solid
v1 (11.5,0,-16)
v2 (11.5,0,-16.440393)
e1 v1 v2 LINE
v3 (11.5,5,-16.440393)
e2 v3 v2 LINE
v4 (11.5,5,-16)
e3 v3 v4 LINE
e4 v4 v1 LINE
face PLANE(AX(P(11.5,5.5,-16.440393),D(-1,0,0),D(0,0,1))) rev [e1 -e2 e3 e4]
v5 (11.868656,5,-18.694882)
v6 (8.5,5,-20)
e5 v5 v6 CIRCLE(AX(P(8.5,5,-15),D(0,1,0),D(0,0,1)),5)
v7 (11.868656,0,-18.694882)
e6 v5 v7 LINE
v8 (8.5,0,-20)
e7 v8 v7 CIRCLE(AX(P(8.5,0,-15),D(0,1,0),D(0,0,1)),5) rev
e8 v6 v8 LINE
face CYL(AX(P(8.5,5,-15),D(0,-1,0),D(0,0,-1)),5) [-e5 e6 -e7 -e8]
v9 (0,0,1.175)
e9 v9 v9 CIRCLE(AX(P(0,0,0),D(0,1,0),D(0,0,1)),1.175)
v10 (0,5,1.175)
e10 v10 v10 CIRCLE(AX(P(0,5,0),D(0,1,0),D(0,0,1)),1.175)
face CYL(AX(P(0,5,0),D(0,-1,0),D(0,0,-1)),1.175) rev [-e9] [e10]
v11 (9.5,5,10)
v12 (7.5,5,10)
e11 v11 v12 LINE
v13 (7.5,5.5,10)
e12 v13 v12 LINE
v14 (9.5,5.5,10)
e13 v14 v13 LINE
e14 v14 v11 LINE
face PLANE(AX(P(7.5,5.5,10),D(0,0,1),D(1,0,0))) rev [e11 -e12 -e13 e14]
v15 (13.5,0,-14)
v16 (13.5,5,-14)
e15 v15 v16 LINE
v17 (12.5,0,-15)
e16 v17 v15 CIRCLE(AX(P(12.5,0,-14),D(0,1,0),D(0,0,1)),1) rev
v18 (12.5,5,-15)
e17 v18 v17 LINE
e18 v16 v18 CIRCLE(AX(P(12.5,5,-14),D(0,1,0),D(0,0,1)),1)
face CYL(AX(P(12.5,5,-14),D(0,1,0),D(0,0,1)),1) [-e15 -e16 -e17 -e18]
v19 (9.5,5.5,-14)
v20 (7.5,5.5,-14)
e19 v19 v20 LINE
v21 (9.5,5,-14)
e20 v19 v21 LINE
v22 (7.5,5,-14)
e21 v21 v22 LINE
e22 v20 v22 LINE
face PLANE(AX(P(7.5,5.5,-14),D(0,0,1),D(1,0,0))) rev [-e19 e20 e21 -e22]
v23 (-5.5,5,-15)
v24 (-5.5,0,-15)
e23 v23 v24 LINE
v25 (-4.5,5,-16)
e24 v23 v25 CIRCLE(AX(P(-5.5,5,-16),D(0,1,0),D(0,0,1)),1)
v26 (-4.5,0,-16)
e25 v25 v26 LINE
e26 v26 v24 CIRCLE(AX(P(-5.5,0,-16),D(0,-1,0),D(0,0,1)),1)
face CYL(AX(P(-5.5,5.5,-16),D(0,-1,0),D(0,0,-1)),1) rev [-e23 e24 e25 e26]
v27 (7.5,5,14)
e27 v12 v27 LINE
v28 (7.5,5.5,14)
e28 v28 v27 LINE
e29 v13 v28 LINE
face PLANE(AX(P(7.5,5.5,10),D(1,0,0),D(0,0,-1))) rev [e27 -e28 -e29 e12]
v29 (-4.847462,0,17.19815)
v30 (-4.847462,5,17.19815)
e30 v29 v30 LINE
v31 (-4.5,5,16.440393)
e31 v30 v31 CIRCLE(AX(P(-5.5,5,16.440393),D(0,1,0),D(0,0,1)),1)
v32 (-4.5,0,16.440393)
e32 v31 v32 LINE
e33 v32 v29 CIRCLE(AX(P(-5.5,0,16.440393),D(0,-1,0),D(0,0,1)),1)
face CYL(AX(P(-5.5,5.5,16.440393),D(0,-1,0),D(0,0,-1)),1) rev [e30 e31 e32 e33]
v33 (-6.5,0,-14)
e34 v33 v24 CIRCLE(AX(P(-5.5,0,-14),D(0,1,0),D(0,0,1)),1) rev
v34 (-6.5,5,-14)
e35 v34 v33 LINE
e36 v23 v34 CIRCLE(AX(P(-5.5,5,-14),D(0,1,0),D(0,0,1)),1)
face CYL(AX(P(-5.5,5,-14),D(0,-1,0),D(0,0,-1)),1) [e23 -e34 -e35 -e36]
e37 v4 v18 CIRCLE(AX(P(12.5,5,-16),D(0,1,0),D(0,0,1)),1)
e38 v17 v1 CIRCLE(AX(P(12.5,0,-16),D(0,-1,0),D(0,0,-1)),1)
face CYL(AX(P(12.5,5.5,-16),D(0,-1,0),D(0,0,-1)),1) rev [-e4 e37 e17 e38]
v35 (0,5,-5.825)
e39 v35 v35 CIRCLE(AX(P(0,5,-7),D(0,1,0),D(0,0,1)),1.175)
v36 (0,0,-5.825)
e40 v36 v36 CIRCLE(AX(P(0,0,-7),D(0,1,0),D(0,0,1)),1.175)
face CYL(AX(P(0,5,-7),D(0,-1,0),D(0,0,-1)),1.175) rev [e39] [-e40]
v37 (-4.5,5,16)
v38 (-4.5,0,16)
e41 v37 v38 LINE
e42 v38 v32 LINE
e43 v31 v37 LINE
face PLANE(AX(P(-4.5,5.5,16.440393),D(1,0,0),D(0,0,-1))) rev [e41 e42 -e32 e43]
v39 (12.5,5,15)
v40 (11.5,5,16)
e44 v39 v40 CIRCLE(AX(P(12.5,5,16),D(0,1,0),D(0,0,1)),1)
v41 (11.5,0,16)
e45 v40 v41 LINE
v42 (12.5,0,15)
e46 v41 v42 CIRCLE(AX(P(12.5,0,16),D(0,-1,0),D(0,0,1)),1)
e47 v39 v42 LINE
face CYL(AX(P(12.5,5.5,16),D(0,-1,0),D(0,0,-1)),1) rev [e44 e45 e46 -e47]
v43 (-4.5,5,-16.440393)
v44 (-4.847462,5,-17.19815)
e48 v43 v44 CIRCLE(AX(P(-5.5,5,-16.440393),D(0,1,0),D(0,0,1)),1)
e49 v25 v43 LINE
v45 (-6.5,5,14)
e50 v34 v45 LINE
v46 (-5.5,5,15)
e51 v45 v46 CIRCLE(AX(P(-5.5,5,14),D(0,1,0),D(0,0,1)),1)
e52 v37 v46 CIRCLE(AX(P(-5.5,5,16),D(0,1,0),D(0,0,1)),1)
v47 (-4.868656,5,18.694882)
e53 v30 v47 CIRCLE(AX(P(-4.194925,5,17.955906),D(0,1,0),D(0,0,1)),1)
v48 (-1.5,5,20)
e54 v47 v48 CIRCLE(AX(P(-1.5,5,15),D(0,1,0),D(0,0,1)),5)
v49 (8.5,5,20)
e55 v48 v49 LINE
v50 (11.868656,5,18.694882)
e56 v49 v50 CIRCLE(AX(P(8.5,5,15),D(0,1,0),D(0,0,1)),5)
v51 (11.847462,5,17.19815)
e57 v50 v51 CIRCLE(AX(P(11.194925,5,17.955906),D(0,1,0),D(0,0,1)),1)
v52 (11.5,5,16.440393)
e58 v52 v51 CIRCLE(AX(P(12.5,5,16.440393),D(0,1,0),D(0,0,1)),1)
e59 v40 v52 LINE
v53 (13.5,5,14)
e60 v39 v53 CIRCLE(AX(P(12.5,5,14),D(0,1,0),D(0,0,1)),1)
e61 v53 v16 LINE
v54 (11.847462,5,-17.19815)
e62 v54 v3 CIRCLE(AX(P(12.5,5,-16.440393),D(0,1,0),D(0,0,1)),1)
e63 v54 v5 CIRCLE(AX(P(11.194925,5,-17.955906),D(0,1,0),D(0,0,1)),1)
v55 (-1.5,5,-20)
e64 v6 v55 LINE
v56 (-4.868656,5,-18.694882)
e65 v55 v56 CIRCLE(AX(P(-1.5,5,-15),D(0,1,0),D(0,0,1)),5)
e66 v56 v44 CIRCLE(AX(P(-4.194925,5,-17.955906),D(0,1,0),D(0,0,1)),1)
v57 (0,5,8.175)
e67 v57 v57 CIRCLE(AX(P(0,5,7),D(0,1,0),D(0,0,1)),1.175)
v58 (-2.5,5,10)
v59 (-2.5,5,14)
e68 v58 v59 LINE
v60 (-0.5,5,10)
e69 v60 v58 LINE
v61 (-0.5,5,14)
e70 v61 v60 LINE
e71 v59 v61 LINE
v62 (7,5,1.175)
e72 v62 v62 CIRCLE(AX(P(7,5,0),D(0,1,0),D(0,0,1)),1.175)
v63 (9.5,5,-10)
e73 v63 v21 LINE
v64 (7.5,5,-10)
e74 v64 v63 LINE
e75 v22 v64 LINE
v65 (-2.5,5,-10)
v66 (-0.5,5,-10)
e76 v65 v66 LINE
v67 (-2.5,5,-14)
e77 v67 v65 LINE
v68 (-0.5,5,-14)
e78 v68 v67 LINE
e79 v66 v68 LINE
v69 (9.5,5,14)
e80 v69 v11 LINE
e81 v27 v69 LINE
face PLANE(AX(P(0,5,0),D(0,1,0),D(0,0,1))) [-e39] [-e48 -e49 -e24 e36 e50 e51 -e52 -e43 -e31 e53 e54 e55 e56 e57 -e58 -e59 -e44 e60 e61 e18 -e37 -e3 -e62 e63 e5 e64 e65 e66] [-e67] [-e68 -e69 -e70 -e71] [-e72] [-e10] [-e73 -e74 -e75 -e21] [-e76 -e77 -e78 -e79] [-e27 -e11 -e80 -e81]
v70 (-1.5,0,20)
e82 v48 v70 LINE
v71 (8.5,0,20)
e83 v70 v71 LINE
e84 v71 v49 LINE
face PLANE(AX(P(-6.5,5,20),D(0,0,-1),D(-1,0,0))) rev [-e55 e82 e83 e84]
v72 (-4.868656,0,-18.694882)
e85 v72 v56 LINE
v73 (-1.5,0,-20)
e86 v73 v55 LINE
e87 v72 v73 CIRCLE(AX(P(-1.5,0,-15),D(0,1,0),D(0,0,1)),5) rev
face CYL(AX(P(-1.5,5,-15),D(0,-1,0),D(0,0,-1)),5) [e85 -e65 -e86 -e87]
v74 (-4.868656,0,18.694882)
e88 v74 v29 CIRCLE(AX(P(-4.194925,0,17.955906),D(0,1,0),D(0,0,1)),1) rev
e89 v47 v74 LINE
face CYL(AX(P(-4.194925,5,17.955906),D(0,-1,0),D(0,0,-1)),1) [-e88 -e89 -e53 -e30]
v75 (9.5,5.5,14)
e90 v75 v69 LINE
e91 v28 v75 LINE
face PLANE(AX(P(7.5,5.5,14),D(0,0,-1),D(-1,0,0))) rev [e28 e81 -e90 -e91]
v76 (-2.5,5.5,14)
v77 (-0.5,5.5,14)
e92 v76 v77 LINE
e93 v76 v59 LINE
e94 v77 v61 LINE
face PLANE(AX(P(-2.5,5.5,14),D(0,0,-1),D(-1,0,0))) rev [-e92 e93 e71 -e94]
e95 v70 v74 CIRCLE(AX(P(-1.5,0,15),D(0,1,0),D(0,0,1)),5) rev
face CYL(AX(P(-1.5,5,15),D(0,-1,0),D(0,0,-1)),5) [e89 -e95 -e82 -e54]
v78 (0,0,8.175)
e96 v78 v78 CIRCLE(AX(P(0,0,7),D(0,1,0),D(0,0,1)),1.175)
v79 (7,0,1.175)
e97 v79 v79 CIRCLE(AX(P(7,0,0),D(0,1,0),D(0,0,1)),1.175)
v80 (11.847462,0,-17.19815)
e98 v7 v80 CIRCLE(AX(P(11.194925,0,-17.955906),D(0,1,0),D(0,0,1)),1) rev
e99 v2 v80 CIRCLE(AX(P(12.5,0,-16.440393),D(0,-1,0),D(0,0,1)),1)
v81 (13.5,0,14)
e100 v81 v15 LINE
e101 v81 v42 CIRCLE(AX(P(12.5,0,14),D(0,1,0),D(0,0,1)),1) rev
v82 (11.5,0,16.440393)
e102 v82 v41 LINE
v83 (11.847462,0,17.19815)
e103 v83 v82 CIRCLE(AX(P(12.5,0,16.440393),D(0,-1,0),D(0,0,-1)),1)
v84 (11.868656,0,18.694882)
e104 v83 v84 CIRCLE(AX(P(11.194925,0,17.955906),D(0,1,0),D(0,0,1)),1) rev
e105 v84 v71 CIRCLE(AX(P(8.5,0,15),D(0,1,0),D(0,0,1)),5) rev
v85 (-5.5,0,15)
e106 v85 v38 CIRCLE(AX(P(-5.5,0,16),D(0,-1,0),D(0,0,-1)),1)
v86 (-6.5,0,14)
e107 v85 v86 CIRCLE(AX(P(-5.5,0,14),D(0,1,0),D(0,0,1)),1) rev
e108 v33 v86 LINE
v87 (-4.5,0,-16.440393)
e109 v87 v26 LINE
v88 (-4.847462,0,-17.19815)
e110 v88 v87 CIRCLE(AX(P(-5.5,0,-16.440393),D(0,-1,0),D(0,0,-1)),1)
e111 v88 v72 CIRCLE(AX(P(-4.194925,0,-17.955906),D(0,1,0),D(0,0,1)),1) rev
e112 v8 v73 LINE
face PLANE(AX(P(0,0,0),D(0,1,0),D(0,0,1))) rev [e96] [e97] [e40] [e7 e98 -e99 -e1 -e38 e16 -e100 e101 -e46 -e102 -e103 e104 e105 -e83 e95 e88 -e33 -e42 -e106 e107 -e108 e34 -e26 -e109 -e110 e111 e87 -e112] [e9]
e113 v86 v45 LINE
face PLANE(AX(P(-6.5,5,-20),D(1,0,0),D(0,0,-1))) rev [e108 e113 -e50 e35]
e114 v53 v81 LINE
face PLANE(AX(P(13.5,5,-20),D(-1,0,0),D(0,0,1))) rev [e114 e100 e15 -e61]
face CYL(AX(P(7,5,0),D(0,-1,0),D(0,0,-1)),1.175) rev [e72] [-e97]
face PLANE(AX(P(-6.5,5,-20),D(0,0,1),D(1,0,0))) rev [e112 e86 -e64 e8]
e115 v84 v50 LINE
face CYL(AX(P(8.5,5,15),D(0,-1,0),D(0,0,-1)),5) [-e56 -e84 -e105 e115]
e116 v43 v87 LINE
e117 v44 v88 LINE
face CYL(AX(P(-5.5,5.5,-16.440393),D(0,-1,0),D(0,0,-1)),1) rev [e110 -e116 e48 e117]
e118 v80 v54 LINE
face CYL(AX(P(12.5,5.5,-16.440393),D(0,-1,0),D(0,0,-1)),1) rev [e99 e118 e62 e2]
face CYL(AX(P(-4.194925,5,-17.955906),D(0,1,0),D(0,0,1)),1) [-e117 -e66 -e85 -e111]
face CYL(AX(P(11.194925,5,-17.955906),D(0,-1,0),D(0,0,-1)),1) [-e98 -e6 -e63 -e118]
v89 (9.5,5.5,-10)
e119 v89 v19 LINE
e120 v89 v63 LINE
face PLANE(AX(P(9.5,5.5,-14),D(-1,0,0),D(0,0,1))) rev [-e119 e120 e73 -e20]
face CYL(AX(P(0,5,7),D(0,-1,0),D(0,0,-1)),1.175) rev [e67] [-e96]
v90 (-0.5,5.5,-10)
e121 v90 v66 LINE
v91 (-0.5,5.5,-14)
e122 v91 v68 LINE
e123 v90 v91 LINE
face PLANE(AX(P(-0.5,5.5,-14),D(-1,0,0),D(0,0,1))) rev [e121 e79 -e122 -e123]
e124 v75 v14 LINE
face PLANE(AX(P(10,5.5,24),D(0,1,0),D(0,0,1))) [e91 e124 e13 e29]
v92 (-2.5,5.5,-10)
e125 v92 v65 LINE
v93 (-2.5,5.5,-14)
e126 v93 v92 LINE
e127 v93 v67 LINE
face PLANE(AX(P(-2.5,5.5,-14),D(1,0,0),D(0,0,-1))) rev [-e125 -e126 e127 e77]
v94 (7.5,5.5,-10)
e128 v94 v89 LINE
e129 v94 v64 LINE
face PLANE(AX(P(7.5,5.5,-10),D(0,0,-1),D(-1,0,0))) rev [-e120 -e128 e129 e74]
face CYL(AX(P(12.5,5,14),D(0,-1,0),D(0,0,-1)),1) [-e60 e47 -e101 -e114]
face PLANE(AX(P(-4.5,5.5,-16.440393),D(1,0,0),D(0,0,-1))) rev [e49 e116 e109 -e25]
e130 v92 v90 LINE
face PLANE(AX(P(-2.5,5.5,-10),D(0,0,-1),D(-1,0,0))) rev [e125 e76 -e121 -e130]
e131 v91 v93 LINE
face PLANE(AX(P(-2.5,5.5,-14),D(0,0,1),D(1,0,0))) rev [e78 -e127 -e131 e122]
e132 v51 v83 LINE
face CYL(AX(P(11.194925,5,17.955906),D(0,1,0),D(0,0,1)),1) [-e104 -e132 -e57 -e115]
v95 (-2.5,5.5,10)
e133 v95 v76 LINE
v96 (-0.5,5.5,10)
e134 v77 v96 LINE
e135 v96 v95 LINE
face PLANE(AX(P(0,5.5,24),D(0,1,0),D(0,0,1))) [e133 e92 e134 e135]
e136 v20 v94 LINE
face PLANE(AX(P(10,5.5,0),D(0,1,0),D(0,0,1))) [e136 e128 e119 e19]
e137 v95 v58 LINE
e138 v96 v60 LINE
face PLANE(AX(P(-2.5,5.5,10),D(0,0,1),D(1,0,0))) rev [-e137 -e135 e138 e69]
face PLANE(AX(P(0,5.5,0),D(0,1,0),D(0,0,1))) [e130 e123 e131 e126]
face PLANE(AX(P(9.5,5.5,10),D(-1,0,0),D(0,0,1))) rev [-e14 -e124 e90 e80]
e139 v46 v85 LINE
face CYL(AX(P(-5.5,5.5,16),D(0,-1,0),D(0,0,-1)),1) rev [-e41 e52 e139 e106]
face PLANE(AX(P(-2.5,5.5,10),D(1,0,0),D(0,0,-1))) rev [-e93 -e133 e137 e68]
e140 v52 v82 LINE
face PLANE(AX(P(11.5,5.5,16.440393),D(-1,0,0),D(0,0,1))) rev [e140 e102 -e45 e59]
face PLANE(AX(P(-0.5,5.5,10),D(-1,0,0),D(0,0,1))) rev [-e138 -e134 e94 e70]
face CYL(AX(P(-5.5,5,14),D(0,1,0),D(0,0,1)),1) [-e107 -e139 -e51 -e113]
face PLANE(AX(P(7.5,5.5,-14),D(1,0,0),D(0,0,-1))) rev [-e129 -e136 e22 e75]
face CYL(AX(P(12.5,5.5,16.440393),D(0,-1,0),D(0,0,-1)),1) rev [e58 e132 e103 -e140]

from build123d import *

# Parameters (mm, degrees)
SKETCH1_W            = 20
SKETCH1_H            = 40
SKETCH1_R            = 1.175
BOSS_EXTRUDE1_DEPTH  = 5
FILLET1_R            = 5
SKETCH2_W            = 2
SKETCH2_H            = 4
BOSS_EXTRUDE2_DEPTH  = 0.5
LPATTERN1_COUNT      = 2
LPATTERN1_PITCH      = 10
LPATTERN1_COUNT_DIR2 = 2
LPATTERN1_PITCH_DIR2 = 24
CUT_EXTRUDE1_DEPTH   = 25.748737342
FILLET2_R            = 1


with BuildPart() as part:
    # Sketch1 → Boss-Extrude1 (new body)
    with BuildSketch(Plane(origin=(0, 0, 0), x_dir=(1, 0, 0), z_dir=(0, 1, 0))):
        with Locations((3.5, 0)):
            Rectangle(SKETCH1_W, SKETCH1_H)
        with Locations(Location((0, 0, 0), (0, 0, 270))):
            Circle(SKETCH1_R, mode=Mode.SUBTRACT)
        with Locations(Location((0, 7, 0), (0, 0, 270))):
            Circle(SKETCH1_R, mode=Mode.SUBTRACT)
        with Locations(Location((7, 0, 0), (0, 0, 270))):
            Circle(SKETCH1_R, mode=Mode.SUBTRACT)
        with Locations(Location((0, -7, 0), (0, 0, 270))):
            Circle(SKETCH1_R, mode=Mode.SUBTRACT)
    extrude(amount=BOSS_EXTRUDE1_DEPTH)

    # Fillet1
    fillet1_edges = [part.edges().sort_by_distance(p)[0] for p in [
        (-6.5, 2.5, -20),
        (13.5, 2.5, -20),
        (13.5, 2.5, 20),
        (-6.5, 2.5, 20),
    ]]
    fillet(fillet1_edges, radius=FILLET1_R)

    # Sketch2 → Boss-Extrude2 (add)
    with BuildSketch(Plane(origin=(0, 5, 0), x_dir=(1, 0, 0), z_dir=(0, 1, 0))):
        with Locations((-1.5, 12)):
            Rectangle(SKETCH2_W, SKETCH2_H)
    boss_extrude2 = extrude(amount=BOSS_EXTRUDE2_DEPTH)

    # LPattern1: Boss-Extrude2 2 × 2
    with Locations(*[(i * LPATTERN1_PITCH, 0, j * LPATTERN1_PITCH_DIR2) for i in range(LPATTERN1_COUNT) for j in range(LPATTERN1_COUNT_DIR2) if (i, j) != (0, 0)]):
        add(boss_extrude2)

    # Sketch4 → Cut-Extrude1 (cut, through all)
    with BuildSketch(Plane.XZ):
        with BuildLine():
            Line((-7.54955844, 17.440393275), (-5.5, 17.440393275))
            ThreePointArc((-5.5, 17.440393275), (-4.792893219, 17.147500056), (-4.5, 16.440393275))
            Line((-4.5, 16.440393275), (-4.5, 16))
            ThreePointArc((-4.5, 16), (-4.792893219, 15.292893219), (-5.5, 15))
            Line((-5.5, 15), (-7.54955844, 15))
            Line((-7.54955844, 15), (-7.54955844, 17.440393275))
        make_face()
        with BuildLine():
            Line((14.54955844, 17.440393275), (14.54955844, 15))
            Line((14.54955844, 15), (12.5, 15))
            ThreePointArc((12.5, 15), (11.792893219, 15.292893219), (11.5, 16))
            Line((11.5, 16), (11.5, 16.440393275))
            ThreePointArc((11.5, 16.440393275), (11.792893219, 17.147500056), (12.5, 17.440393275))
            Line((12.5, 17.440393275), (14.54955844, 17.440393275))
        make_face()
        with BuildLine():
            Line((14.54955844, -17.440393275), (12.5, -17.440393275))
            ThreePointArc((12.5, -17.440393275), (11.792893219, -17.147500056), (11.5, -16.440393275))
            Line((11.5, -16.440393275), (11.5, -16))
            ThreePointArc((11.5, -16), (11.792893219, -15.292893219), (12.5, -15))
            Line((12.5, -15), (14.54955844, -15))
            Line((14.54955844, -15), (14.54955844, -17.440393275))
        make_face()
        with BuildLine():
            Line((-4.5, -16.440393275), (-4.5, -16))
            ThreePointArc((-4.5, -16), (-4.792893219, -15.292893219), (-5.5, -15))
            Line((-5.5, -15), (-7.54955844, -15))
            Line((-7.54955844, -15), (-7.54955844, -17.440393275))
            Line((-7.54955844, -17.440393275), (-5.5, -17.440393275))
            ThreePointArc((-5.5, -17.440393275), (-4.792893219, -17.147500056), (-4.5, -16.440393275))
        make_face()
    extrude(amount=-CUT_EXTRUDE1_DEPTH, mode=Mode.SUBTRACT)

    # Fillet2
    fillet2_edges = [part.edges().sort_by_distance(p)[0] for p in [
        (12.863998243, 2.5, -17.440393275),
        (13.5, 2.5, -15),
        (-5.863998243, 2.5, -17.440393275),
        (-6.5, 2.5, -15),
        (13.5, 2.5, 15),
        (12.863998243, 2.5, 17.440393275),
        (-6.5, 2.5, 15),
        (-5.863998243, 2.5, 17.440393275),
    ]]
    fillet(fillet2_edges, radius=FILLET2_R - 0.0001)  # a hair under: the kernel refuses the full size


solid = part.part
